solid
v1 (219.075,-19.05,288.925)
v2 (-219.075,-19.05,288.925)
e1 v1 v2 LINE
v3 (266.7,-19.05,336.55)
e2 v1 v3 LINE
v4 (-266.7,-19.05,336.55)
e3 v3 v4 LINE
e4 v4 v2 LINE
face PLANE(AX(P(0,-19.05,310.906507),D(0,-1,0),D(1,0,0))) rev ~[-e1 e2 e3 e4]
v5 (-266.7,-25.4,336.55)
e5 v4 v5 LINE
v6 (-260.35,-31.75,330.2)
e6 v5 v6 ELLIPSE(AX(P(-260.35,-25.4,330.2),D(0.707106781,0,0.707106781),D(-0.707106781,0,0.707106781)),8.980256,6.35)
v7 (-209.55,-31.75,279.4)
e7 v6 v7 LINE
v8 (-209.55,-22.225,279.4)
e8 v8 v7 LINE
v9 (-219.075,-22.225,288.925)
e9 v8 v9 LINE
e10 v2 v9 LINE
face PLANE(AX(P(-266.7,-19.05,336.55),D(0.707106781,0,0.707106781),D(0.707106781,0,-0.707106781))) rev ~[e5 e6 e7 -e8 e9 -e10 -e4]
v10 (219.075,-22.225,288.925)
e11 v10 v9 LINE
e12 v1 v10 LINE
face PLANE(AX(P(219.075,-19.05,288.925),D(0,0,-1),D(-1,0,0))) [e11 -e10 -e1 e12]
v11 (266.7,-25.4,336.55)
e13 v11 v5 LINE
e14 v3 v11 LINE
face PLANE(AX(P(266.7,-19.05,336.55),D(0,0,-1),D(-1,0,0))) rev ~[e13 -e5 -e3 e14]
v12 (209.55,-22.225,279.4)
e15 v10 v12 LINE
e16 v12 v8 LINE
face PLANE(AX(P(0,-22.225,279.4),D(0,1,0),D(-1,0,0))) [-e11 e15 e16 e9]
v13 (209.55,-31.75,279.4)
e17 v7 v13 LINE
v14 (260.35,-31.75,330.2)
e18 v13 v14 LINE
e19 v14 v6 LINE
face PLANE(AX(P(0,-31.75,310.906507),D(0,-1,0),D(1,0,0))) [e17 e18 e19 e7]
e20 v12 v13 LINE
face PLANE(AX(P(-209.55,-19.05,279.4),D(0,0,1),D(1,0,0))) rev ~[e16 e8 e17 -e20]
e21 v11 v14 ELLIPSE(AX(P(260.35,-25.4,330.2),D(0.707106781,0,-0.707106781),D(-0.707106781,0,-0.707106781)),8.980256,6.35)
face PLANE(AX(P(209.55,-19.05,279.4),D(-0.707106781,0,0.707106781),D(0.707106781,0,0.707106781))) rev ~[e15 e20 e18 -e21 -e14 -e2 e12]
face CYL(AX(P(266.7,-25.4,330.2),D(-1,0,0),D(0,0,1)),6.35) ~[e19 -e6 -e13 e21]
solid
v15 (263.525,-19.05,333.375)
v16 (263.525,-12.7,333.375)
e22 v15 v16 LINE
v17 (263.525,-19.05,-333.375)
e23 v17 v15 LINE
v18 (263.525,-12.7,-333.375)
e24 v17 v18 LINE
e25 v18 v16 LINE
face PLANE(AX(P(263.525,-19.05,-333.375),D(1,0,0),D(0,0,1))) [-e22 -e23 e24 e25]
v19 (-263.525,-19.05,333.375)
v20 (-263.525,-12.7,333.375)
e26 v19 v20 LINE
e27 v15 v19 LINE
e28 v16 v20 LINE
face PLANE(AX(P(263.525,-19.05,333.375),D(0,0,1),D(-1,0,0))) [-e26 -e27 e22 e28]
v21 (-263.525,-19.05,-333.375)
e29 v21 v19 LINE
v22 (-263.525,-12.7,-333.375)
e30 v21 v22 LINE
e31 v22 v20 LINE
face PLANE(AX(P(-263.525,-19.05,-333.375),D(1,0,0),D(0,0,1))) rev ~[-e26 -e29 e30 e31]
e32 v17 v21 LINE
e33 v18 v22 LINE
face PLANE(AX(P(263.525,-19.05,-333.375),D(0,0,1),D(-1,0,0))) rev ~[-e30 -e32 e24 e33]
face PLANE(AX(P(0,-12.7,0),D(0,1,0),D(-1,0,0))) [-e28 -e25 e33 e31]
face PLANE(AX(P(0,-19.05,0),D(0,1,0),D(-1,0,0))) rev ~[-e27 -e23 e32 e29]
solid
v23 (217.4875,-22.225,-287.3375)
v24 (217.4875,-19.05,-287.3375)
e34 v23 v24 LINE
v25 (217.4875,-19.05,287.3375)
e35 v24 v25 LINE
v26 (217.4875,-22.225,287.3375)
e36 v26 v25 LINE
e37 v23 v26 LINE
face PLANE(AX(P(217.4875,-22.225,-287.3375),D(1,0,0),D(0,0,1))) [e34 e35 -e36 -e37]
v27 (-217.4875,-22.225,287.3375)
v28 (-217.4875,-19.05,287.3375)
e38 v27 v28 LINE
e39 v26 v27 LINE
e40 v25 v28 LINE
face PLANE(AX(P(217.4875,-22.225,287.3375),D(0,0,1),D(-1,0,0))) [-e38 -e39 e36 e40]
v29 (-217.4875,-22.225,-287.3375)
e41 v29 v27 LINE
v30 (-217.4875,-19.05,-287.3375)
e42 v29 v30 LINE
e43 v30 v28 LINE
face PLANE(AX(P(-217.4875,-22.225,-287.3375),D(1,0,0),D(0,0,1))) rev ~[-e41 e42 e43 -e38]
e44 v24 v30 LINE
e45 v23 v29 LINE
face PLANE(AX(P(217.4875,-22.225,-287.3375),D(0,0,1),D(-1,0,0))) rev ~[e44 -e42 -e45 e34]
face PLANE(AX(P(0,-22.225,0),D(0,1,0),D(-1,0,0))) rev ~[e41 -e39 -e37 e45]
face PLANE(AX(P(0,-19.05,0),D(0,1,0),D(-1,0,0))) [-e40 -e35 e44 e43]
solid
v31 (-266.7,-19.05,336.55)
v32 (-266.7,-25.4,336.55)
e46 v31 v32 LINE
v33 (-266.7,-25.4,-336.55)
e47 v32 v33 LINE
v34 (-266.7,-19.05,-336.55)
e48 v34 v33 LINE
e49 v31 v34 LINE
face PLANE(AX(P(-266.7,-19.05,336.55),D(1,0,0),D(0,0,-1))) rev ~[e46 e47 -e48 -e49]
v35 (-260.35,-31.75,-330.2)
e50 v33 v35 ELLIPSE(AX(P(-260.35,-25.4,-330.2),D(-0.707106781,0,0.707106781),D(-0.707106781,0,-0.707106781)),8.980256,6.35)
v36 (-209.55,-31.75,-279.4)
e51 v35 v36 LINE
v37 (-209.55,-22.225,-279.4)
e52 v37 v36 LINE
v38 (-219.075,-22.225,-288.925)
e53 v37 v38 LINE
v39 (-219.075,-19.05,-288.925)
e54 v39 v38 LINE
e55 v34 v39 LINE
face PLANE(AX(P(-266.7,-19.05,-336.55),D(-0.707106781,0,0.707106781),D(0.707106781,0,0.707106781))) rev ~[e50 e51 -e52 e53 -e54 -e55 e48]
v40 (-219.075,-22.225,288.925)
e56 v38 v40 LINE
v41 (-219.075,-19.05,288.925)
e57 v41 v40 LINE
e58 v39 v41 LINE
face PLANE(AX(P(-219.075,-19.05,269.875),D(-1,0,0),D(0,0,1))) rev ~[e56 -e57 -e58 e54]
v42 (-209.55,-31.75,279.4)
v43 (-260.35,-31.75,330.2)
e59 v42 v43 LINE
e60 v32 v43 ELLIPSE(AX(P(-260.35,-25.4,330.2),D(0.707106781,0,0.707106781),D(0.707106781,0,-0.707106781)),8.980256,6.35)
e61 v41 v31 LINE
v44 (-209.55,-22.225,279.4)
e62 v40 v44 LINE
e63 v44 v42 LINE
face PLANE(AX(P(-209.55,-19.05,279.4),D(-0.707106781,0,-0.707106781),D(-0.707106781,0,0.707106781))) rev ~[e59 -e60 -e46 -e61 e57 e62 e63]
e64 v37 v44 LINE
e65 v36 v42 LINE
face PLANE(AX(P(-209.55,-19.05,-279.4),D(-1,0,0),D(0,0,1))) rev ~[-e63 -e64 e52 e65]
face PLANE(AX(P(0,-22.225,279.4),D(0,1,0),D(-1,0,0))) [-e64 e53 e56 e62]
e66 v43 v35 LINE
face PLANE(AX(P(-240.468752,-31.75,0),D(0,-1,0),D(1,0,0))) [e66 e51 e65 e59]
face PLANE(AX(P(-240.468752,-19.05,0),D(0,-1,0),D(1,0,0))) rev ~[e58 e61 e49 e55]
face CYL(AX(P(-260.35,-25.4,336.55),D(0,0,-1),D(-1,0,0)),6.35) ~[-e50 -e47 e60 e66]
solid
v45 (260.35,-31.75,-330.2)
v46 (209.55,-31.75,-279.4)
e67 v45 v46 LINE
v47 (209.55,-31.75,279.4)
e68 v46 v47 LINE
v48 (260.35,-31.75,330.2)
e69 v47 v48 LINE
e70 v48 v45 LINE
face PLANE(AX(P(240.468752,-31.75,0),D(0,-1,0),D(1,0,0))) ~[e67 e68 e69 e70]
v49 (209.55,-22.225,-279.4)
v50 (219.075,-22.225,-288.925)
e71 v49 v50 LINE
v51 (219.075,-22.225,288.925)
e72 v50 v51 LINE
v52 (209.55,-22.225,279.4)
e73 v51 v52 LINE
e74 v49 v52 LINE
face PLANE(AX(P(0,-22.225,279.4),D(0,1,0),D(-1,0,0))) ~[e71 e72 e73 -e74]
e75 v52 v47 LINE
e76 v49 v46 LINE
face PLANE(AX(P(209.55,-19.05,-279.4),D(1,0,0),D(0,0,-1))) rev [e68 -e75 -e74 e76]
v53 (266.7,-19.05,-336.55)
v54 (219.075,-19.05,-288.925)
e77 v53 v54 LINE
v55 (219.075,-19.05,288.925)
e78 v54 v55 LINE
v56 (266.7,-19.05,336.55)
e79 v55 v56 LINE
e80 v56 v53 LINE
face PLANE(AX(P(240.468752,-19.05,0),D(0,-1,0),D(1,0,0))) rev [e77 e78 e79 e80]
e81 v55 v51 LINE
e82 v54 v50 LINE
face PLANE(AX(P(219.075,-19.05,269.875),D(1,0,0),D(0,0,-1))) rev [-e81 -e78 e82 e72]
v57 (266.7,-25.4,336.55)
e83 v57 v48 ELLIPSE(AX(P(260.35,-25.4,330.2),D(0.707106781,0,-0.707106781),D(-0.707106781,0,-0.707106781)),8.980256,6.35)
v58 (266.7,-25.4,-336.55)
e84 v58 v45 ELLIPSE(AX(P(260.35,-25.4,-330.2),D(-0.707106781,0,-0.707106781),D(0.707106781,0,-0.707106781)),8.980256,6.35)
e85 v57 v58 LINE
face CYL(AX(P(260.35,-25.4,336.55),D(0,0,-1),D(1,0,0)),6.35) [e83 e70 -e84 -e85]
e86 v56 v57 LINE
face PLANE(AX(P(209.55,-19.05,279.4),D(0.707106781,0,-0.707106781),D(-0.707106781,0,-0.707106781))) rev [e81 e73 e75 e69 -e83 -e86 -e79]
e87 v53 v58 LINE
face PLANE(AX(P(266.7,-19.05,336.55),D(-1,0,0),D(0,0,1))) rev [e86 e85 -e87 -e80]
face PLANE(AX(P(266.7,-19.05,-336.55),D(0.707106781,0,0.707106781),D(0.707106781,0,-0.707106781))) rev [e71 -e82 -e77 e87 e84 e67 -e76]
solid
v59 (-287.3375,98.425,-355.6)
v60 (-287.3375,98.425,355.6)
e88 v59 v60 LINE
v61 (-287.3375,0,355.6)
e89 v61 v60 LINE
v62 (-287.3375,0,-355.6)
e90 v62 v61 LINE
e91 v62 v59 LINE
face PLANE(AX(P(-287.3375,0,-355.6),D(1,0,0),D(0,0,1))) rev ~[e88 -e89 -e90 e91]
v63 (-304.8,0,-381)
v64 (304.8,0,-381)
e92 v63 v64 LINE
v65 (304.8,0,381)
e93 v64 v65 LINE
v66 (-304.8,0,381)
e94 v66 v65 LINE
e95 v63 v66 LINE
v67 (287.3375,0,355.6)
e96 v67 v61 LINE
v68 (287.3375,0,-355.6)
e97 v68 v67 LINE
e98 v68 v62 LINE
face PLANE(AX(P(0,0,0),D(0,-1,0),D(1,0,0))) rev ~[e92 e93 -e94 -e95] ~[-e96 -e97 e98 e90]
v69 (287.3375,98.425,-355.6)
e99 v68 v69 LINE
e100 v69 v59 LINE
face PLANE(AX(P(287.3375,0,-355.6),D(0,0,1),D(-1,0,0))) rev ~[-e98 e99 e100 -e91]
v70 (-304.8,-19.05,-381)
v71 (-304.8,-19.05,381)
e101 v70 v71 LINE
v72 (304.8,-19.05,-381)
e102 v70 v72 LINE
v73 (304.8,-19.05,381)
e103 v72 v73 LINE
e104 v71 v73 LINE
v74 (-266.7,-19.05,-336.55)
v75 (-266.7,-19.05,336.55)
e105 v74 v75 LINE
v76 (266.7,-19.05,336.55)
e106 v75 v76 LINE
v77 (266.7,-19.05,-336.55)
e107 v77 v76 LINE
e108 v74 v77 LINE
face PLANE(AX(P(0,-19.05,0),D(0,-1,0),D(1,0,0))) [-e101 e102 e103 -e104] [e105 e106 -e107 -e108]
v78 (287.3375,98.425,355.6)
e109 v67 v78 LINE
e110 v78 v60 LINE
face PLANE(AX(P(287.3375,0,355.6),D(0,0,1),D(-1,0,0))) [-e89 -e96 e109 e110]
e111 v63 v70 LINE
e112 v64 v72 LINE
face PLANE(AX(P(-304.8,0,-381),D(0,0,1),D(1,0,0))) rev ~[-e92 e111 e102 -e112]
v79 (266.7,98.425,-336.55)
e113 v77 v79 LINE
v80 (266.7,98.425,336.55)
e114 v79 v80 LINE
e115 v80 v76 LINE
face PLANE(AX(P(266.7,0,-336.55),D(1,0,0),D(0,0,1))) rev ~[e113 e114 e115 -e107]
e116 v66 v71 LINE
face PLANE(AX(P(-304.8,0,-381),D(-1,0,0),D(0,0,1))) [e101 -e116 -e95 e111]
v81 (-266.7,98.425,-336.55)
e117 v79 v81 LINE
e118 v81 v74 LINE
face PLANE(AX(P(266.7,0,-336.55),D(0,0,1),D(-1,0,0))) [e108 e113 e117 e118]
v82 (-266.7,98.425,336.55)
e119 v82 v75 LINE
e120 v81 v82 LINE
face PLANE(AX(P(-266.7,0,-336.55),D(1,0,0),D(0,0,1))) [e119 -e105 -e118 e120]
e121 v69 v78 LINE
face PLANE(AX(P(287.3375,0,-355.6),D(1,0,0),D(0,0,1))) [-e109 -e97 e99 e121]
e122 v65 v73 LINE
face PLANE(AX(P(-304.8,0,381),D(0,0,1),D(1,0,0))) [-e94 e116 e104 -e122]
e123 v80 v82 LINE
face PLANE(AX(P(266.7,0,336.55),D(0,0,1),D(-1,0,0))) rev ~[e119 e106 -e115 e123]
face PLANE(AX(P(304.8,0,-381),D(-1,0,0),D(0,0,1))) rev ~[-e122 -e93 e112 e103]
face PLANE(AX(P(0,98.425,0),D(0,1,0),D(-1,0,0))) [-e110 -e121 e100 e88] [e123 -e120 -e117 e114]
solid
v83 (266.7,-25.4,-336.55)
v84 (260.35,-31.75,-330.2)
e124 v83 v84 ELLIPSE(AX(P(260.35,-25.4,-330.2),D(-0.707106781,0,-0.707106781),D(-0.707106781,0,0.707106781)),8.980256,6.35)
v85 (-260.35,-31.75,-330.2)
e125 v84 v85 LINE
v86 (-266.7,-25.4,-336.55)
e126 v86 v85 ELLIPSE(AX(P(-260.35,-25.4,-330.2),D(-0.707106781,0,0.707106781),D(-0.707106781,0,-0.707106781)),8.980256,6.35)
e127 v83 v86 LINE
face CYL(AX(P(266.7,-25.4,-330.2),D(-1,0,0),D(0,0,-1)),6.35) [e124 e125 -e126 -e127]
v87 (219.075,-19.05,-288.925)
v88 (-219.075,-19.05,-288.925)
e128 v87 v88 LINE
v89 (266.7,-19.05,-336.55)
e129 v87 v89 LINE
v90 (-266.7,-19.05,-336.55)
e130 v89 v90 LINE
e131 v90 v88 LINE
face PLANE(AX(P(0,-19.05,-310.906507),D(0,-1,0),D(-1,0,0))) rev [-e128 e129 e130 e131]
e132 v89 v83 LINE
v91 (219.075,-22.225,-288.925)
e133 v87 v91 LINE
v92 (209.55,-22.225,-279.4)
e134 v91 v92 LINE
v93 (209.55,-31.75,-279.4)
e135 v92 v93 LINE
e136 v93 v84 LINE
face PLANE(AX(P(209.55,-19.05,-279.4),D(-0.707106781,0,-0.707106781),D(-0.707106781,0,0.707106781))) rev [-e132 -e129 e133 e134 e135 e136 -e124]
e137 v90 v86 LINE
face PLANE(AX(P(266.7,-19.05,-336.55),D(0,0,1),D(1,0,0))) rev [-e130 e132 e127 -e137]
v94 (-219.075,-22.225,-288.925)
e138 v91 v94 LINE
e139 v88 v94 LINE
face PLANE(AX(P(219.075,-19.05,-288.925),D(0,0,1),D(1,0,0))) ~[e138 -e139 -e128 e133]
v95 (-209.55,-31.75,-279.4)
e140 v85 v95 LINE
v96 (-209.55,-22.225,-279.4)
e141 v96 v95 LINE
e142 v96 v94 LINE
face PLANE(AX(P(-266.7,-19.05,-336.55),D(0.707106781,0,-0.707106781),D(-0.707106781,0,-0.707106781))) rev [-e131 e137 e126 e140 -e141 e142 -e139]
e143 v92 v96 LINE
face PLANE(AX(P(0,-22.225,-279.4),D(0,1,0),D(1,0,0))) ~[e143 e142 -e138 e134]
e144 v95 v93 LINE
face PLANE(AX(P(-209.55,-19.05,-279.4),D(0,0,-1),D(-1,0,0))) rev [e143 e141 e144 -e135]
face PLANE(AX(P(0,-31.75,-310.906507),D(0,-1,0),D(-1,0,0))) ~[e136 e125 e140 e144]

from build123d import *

# Parameters (mm, degrees)
F0_W      = 609.6
F0_H      = 762
F0_W_2    = 533.4
F0_H_2    = 673.1
F1_DEPTH  = 19.05
F2_W      = 574.675
F2_H      = 711.2
F2_W_2    = 533.4
F2_H_2    = 673.1
F3_DEPTH  = 98.425
F5_DEPTH  = 12.7
F6_DEPTH  = 12.7
F7_R      = 6.35
F7_2_R    = 6.35
F8_W      = 438.15
F8_H      = 19.05
F9_DEPTH  = 3.175
F10_W     = 19.05
F10_H     = 577.85
F11_DEPTH = 3.175
F14_W     = 434.975
F14_H     = 574.675
F15_DEPTH = 3.175
F16_W     = 530.225
F16_H     = 669.925
F17_DEPTH = 6.35
F18_W     = 527.05
F18_H     = 666.75
F19_DEPTH = 6.35


# Not quite as in the source:
# - a feature names something its author has since deleted; it is built from what else it names


with BuildPart() as f1:
    # F0 (on Front) → F1 (new body)
    with BuildSketch(Plane.XZ):
        Rectangle(F0_W, F0_H)
        Rectangle(F0_W_2, F0_H_2, mode=Mode.SUBTRACT)
    extrude(amount=F1_DEPTH)

    # F2 (on face) → F3 (join)
    with BuildSketch(Plane(origin=(0, 0, 0), x_dir=(-1, 0, 0), z_dir=(0, 1, 0))):
        Rectangle(F2_W, F2_H)
        Rectangle(F2_W_2, F2_H_2, mode=Mode.SUBTRACT)
    extrude(amount=F3_DEPTH)


with BuildPart() as f5:
    # F4 (on face) → F5 (new body)
    with BuildSketch(Plane.XZ.offset(19.05)):
        Polygon((209.55, 279.4), (266.7, 336.55), (-266.7, 336.55), (-209.55, 279.4), align=None)
    extrude(amount=F5_DEPTH)

    # F7
    f7_edges = [f5.edges().sort_by_distance(p)[0] for p in [
        (0, -31.75, 336.55),
    ]]
    fillet(f7_edges, radius=F7_R)


with BuildPart() as f6:
    # F4 (on face) → F6 (new body)
    with BuildSketch(Plane.XZ.offset(19.05)):
        Polygon((-209.55, 279.4), (-266.7, 336.55), (-266.7, -336.55), (-209.55, -279.4), align=None)
    extrude(amount=F6_DEPTH)

    # F7#2
    f7_2_edges = [f6.edges().sort_by_distance(p)[0] for p in [
        (-266.7, -31.75, 0),
    ]]
    fillet(f7_2_edges, radius=F7_2_R)


with BuildPart() as f9_tool:
    # F8 (on face) → F9 (new body)
    with BuildSketch(Plane(origin=(0, -19.05, 0), x_dir=(-1, 0, 0), z_dir=(0, 1, 0))):
        with Locations((0, 279.4)):
            Rectangle(F8_W, F8_H)
    extrude(amount=-F9_DEPTH)


with BuildPart() as f5_1:
    add(f5.part)

    # F9: cut by f9_tool
    add(f9_tool.part, mode=Mode.SUBTRACT)


with BuildPart() as f6_1:
    add(f6.part)

    # F9: cut by f9_tool
    add(f9_tool.part, mode=Mode.SUBTRACT)

    # F10 (on face) → F11 (cut)
    with BuildSketch(Plane(origin=(0, -19.05, 0), x_dir=(-1, 0, 0), z_dir=(0, 1, 0))):
        with Locations((209.55, 0)):
            Rectangle(F10_W, F10_H)
    extrude(amount=-F11_DEPTH, mode=Mode.SUBTRACT)


with BuildPart() as f12_1:
    # F12: instance of F6
    add(f6_1.part.mirror(Plane.YZ))


with BuildPart() as f13_1:
    # F13: instance of F5
    add(f5_1.part.mirror(Plane.XY))


with BuildPart() as f15:
    # F14 (on face) → F15 (new body)
    with BuildSketch(Plane(origin=(0, -22.225, 0), x_dir=(-1, 0, 0), z_dir=(0, 1, 0))):
        Rectangle(F14_W, F14_H)
    extrude(amount=F15_DEPTH)


with BuildPart() as f17:
    # F16 (on face) → F17 (new body)
    with BuildSketch(Plane(origin=(0, -19.05, 0), x_dir=(-1, 0, 0), z_dir=(0, 1, 0))):
        Rectangle(F16_W, F16_H)
    extrude(amount=F17_DEPTH)


with BuildPart() as f19:
    # F18 (on face) → F19 (new body)
    with BuildSketch(Plane(origin=(0, -19.05, 0), x_dir=(-1, 0, 0), z_dir=(0, 1, 0))):
        Rectangle(F18_W, F18_H)
    extrude(amount=F19_DEPTH)


solid = Compound([f1.part, f5_1.part, f6_1.part, f12_1.part, f13_1.part, f15.part, f19.part])
